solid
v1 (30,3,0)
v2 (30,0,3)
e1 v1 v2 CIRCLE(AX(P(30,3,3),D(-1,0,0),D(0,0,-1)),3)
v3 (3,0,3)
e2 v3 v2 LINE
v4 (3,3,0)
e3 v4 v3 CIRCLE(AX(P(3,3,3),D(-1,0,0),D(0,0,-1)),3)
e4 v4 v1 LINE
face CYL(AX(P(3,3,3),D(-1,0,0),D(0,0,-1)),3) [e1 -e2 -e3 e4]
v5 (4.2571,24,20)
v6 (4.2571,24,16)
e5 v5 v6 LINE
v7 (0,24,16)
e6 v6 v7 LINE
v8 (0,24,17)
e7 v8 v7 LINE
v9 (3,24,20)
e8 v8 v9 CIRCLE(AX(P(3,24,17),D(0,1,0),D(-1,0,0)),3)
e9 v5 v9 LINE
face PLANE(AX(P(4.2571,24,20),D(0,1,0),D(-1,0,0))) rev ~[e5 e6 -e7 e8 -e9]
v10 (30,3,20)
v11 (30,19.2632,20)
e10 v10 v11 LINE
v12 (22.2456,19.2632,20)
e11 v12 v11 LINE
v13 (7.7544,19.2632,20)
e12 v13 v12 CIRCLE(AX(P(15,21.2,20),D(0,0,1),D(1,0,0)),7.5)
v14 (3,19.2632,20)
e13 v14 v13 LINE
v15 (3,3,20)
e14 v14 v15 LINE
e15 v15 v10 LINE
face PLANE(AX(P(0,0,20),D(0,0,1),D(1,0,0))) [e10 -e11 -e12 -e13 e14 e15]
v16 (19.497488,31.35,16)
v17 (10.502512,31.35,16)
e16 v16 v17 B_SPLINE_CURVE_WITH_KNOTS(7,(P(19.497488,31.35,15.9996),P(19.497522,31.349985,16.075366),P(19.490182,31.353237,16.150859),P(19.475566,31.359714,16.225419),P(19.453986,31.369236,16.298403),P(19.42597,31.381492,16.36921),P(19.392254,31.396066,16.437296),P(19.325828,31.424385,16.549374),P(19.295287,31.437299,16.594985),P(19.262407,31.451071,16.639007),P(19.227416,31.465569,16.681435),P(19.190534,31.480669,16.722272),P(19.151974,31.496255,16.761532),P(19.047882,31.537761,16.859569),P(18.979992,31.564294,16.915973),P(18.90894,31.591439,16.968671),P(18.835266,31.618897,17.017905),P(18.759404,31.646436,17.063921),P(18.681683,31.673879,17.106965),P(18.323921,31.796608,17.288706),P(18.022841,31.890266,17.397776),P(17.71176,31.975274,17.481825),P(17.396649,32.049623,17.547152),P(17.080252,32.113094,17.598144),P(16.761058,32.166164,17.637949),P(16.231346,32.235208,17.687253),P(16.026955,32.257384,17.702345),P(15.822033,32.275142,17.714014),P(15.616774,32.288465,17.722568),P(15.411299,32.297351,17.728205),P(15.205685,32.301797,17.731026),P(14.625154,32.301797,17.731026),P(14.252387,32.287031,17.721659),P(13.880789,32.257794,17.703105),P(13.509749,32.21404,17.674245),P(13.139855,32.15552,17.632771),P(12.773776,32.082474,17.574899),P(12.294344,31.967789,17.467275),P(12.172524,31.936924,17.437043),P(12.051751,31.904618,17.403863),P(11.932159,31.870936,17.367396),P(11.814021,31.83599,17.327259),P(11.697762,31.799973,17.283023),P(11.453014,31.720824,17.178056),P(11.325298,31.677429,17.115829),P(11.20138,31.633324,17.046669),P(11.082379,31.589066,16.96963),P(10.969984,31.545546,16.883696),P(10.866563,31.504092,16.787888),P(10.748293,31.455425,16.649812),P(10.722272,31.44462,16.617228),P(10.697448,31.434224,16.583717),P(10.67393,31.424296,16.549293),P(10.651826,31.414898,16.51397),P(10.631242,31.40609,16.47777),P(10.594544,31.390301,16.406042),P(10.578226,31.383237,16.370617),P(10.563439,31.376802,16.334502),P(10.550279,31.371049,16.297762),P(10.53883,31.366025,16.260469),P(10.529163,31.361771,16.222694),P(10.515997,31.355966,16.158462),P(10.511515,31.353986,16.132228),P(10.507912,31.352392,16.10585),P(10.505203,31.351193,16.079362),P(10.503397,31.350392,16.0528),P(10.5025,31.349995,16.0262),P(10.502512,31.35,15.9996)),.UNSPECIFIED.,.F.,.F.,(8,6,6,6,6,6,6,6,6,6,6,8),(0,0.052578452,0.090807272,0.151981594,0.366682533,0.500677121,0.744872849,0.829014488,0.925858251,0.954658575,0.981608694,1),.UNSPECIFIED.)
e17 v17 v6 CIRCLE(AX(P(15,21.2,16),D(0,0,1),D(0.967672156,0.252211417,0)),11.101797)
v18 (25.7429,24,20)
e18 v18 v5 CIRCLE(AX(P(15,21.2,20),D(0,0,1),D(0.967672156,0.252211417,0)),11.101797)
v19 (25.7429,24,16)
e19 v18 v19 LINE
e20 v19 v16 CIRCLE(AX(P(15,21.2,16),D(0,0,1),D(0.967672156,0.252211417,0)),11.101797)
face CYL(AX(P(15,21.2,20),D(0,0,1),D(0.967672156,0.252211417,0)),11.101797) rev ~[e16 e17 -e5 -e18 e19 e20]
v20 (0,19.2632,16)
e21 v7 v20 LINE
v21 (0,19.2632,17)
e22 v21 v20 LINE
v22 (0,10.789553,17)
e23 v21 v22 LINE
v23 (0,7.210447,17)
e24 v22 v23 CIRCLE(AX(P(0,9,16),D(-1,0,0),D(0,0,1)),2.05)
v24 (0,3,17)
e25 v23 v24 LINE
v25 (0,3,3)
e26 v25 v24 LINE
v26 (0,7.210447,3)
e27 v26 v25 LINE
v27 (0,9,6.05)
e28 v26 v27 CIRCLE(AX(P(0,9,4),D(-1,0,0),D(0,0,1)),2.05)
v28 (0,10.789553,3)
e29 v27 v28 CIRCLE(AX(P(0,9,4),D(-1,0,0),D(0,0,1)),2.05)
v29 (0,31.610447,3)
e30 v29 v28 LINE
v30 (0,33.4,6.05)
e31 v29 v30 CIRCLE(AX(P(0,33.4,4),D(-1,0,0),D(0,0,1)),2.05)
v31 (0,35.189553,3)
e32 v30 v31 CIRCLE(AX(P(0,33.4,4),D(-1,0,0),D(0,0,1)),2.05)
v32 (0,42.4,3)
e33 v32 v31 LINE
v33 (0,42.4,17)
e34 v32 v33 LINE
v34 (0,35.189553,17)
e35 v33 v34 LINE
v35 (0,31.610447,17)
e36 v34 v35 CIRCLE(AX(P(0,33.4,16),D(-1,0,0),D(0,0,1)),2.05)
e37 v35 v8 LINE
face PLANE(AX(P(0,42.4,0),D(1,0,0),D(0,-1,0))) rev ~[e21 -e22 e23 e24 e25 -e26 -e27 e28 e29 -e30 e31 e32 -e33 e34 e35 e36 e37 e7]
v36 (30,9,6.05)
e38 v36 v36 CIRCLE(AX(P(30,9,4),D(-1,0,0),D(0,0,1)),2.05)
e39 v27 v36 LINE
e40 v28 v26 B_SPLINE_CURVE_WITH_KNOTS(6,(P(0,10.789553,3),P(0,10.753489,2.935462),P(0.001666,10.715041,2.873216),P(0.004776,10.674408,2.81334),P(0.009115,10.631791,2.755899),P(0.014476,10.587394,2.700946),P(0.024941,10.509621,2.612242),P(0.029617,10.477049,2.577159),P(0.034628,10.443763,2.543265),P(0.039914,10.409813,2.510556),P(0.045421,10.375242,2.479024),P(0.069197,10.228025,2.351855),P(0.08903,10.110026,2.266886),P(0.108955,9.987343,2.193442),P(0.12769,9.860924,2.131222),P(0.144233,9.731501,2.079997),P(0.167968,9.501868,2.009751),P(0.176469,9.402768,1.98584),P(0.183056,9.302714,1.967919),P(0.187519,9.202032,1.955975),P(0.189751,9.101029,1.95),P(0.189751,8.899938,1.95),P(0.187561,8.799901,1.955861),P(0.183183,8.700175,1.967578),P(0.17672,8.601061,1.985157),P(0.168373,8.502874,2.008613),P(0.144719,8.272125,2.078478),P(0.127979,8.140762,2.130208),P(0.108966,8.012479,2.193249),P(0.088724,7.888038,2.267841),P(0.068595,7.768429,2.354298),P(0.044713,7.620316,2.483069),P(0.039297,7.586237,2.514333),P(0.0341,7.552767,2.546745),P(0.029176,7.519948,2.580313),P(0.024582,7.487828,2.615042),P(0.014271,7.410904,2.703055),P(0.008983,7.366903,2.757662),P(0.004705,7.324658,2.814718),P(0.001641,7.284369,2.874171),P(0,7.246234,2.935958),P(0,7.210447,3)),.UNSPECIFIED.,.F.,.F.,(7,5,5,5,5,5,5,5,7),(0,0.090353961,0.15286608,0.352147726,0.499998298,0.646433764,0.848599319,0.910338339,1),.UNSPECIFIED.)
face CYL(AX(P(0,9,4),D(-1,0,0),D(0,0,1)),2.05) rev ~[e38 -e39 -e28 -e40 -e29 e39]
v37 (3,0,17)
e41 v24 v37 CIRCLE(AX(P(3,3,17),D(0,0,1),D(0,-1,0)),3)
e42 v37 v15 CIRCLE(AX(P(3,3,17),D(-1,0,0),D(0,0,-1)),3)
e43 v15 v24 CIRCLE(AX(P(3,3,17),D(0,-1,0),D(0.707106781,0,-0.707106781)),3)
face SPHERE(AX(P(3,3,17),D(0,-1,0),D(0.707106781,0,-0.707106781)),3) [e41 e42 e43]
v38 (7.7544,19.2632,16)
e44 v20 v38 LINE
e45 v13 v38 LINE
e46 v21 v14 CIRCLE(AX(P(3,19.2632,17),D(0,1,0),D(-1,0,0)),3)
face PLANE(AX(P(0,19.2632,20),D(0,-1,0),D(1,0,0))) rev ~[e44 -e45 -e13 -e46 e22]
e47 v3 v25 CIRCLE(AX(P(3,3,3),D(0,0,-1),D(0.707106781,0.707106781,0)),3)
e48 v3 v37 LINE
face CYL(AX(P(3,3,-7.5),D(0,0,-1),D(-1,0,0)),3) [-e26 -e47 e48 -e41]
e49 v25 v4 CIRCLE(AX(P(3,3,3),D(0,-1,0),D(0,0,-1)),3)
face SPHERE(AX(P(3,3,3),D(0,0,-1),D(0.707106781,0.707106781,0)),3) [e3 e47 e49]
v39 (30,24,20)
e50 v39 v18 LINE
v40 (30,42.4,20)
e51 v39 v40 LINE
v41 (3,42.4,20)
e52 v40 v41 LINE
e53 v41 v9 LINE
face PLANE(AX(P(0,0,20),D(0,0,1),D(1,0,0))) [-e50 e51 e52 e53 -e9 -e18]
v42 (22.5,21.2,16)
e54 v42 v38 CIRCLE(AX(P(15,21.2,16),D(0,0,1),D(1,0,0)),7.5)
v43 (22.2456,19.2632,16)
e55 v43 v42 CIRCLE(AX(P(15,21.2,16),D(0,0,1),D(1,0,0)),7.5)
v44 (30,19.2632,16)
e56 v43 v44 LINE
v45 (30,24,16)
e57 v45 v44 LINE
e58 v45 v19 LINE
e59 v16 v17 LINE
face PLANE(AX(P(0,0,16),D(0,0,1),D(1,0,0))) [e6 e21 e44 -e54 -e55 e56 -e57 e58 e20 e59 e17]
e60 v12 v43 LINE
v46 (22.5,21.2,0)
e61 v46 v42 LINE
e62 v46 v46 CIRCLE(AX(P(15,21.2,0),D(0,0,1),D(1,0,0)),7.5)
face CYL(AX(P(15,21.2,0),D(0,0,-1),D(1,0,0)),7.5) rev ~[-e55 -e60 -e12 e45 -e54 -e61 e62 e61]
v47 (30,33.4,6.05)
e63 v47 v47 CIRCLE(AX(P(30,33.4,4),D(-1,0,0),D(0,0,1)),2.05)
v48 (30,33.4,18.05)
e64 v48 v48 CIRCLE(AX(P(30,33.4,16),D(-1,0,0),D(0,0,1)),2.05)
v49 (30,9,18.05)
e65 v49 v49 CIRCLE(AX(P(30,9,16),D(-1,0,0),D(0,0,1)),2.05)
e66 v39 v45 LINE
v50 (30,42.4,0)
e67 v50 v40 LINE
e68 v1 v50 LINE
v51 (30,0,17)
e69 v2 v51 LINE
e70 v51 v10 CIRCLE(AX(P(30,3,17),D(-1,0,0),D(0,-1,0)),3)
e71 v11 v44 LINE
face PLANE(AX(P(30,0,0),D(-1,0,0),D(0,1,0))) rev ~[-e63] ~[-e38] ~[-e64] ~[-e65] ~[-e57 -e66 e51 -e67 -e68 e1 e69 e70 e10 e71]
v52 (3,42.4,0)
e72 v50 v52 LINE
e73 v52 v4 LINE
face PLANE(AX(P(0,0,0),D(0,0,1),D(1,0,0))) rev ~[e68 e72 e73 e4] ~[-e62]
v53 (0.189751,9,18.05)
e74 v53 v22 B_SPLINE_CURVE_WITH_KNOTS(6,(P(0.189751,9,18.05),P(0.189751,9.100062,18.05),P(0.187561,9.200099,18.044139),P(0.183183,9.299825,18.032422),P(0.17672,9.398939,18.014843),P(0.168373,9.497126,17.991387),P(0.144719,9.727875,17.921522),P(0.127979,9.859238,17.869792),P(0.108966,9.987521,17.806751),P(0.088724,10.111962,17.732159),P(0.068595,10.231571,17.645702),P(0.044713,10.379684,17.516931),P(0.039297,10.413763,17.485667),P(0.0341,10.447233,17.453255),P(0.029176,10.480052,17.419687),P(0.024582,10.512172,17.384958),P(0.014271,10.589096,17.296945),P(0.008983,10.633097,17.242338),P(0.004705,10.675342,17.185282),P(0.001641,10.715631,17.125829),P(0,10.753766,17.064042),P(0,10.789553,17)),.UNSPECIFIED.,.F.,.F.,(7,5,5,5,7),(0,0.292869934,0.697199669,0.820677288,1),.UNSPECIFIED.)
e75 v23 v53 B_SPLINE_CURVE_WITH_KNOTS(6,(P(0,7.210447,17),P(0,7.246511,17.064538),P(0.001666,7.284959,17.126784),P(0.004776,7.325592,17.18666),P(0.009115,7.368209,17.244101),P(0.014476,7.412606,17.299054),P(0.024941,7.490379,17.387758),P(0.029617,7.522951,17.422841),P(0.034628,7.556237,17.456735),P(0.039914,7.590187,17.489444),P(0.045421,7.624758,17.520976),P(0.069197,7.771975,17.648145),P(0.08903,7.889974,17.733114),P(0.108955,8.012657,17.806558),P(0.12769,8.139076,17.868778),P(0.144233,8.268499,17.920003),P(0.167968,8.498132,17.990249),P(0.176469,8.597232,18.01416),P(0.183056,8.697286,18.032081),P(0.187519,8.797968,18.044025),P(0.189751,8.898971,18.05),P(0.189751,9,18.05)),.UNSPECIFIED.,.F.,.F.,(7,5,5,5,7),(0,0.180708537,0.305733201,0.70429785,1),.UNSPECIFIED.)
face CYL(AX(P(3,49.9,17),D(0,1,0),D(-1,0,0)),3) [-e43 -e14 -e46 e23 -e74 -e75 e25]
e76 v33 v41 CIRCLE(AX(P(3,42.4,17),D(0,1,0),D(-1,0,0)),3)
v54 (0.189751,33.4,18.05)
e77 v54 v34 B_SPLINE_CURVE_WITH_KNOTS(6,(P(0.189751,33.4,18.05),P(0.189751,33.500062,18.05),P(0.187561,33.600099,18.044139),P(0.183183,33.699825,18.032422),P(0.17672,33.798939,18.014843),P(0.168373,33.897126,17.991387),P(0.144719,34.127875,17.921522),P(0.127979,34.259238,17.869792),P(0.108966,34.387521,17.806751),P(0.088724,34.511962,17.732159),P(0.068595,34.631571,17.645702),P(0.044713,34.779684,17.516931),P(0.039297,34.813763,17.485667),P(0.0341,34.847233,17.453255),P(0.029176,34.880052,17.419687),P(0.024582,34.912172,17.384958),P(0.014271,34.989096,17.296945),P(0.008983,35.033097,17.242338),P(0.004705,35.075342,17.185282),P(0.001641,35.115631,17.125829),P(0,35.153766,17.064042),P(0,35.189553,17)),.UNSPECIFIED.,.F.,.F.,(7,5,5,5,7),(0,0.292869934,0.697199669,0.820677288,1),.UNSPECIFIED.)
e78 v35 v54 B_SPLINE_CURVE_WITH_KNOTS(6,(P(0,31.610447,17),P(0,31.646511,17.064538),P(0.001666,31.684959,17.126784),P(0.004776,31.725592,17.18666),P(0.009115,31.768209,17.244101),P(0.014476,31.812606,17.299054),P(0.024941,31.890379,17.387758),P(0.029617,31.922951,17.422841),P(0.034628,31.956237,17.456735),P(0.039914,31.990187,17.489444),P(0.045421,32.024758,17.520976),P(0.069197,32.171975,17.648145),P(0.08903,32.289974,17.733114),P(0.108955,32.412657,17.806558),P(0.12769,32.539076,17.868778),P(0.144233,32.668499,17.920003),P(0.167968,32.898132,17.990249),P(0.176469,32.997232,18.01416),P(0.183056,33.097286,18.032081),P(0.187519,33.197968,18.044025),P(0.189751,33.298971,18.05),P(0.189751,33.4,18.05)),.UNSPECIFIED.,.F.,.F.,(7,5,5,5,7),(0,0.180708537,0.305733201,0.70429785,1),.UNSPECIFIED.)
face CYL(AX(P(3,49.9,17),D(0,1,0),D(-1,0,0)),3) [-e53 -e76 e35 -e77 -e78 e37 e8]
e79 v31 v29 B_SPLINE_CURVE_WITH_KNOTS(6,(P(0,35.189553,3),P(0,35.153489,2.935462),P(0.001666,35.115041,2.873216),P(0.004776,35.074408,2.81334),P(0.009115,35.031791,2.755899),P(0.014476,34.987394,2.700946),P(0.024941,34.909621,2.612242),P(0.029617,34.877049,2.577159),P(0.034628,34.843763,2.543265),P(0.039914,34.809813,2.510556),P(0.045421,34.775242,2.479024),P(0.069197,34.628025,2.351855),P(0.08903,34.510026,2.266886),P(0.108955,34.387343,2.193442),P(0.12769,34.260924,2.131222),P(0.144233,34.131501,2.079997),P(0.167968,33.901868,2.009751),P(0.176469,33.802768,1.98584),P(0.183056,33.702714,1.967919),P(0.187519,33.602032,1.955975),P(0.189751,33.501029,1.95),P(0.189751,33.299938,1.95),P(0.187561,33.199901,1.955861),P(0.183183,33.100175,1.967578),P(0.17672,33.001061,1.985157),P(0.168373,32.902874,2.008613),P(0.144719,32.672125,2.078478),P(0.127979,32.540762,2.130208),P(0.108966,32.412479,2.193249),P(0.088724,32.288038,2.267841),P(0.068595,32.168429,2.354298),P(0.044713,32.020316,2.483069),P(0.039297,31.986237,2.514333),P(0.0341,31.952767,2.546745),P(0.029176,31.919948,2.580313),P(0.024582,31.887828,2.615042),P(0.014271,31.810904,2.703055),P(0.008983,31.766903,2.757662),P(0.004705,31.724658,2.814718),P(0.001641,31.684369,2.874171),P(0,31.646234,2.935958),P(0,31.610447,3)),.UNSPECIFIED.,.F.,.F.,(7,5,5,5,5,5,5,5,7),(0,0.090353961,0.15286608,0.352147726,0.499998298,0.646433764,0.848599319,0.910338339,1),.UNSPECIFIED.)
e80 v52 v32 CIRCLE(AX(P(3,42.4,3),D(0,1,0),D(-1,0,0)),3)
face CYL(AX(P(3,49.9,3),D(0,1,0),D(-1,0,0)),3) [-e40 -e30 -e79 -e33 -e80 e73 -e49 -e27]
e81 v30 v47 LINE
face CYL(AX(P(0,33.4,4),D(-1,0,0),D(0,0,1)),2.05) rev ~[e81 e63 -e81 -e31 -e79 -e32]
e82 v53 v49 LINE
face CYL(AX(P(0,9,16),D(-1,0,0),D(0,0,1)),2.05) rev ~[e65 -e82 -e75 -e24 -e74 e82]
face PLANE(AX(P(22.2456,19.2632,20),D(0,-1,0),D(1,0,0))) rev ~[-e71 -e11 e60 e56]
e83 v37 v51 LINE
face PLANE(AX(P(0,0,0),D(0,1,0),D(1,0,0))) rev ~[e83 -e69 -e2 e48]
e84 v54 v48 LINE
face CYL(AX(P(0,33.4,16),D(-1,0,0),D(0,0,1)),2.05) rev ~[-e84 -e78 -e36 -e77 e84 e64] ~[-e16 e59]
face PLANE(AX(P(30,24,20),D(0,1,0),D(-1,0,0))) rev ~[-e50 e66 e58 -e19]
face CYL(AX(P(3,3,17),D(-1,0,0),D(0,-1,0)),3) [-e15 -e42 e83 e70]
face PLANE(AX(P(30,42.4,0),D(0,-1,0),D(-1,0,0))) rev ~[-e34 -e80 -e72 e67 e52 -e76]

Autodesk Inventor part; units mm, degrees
ref_plane "YZ Plane" through (0, 0, 0) normal (1, 0, 0) x (0, 1, 0)
ref_plane "XZ Plane" through (0, 0, 0) normal (0, 1, 0) x (-1, 0, 0)
ref_plane "XY Plane" through (0, 0, 0) normal (0, 0, 1) x (1, 0, 0)
sketch "Sketch1" plane through (0, 0, 0) normal (0, 0, 1) x (1, 0, 0)
  line L0 (0, 0) -> (30, 0)
  line L1 (30, 0) -> (30, 42.4)
  line L2 (30, 42.4) -> (0, 42.4)
  line L3 (0, 42.4) -> (0, 0)
  circle A0 centre (15, 21.2) radius 7.5
  dimension "d0" = 42.4
  dimension "d1" = 30
  dimension "d2" = 15
  dimension "d3" = 21.2
  dimension "d4" = 15
extrude "Extrusion1" add sketch "Sketch1" along normal blind 20
sketch "Sketch2" plane through (0, 0, 0) normal (-1, 0, 0) x (0, 0, 1)
  line L0 (20, 0) -> (20, 42.4) projected
  line L1 (0, 42.4) -> (20, 42.4) projected
  line L2 (0, 42.4) -> (0, 0) projected
  line L3 (0, 0) -> (20, 0) projected
  circle A0 centre (4, 33.4) radius 2.05
  circle A1 centre (16, 33.4) radius 2.05
  circle A2 centre (4, 9) radius 2.05
  circle A3 centre (16, 9) radius 2.05
  dimension "d7" = 4.1
  dimension "d8" = 4
  dimension "d9" = 4
  dimension "d10" = 4
  dimension "d11" = 4
  dimension "d12" = 9
  dimension "d13" = 9
  dimension "d14" = 9
  dimension "d15" = 9
extrude "Extrusion6" cut sketch "Sketch2" against normal through all contours A0 | A1 | A2 | A3
fillet "Fillet3" radius 3 3 edges at (0, 21.2, 20) (0, 21.2, 0) (0, 0, 10)
fillet "Fillet4" radius 3 4 edges at (0.8787, 0.8787, 19.1213) (16.5, 0, 20) (0.8787, 0.8787, 0.8787) (16.5, 0, 0)
sketch "Sketch6" plane through (0, 0, 20) normal (0, 0, 1) x (1, 0, 0)
  circle A0 centre (15, 21.2) radius 7.5 projected
  line L0 (30, 42.4) -> (30, 3) projected
  line L1 (0, 24) -> (0, 19.2632)
  line L2 (30, 24) -> (25.7429, 24)
  line L3 (4.2571, 24) -> (0, 24)
  arc A1 (25.7429, 24) -> (4.2571, 24) centre (15, 21.2) ccw
  line L4 (0, 19.2632) -> (7.7544, 19.2632)
  line L5 (22.2456, 19.2632) -> (30, 19.2632)
  point P0 (0, 0)
extrude "Extrusion7" cut sketch "Sketch6" against normal blind 4 contours A0 L4 L1 L3 A1 L2 L0 L5
sketch "Sketch3" plane through (0, 0, 0) normal (0, -1, 0) x (1, 0, 0)
  line L0 (30, 20) -> (0, 20) projected
  line L1 (0, 0) -> (0, 20) projected
  line L2 (30, 0) -> (30, 20) projected
  circle A0 centre (5, 10) radius 2.05
  circle A1 centre (25, 10) radius 2.05
  dimension "d18" = 4.1
  dimension "d19" = 5
  dimension "d20" = 5
  dimension "d21" = 10
  dimension "d22" = 10
sketch "Sketch4" plane through (0, 0, 0) normal (-1, 0, 0) x (0, 0, 1)
  circle A0 centre (16, 9) radius 2.05 projected
  circle A1 centre (4, 9) radius 2.05 projected
  circle A2 centre (16, 33.4) radius 2.05 projected
  circle A3 centre (4, 33.4) radius 2.05 projected
  circle A4 centre (4, 33.4) radius 3.75
  circle A5 centre (16, 33.4) radius 3.75
  circle A6 centre (4, 9) radius 3.75
  circle A7 centre (16, 9) radius 3.75
  dimension "d25" = 7.5
sketch "Sketch5" plane through (0, 0, 0) normal (0, -1, 0) x (1, 0, 0)
  circle A0 centre (25, 10) radius 2.05 projected
  circle A1 centre (5, 10) radius 2.05 projected
  circle A2 centre (5, 10) radius 3.75
  circle A3 centre (25, 10) radius 3.75
  dimension "d28" = 7.5
equation "\"d3\" = 0.5 * d0"
equation "\"d9\" = d8"
equation "\"d10\" = d8"
equation "\"d11\" = d8"
equation "\"d13\" = d12"
equation "\"d14\" = d12"
equation "\"d15\" = d12"
equation "\"d20\" = d19"
properties part number "V5 multi bottom"
